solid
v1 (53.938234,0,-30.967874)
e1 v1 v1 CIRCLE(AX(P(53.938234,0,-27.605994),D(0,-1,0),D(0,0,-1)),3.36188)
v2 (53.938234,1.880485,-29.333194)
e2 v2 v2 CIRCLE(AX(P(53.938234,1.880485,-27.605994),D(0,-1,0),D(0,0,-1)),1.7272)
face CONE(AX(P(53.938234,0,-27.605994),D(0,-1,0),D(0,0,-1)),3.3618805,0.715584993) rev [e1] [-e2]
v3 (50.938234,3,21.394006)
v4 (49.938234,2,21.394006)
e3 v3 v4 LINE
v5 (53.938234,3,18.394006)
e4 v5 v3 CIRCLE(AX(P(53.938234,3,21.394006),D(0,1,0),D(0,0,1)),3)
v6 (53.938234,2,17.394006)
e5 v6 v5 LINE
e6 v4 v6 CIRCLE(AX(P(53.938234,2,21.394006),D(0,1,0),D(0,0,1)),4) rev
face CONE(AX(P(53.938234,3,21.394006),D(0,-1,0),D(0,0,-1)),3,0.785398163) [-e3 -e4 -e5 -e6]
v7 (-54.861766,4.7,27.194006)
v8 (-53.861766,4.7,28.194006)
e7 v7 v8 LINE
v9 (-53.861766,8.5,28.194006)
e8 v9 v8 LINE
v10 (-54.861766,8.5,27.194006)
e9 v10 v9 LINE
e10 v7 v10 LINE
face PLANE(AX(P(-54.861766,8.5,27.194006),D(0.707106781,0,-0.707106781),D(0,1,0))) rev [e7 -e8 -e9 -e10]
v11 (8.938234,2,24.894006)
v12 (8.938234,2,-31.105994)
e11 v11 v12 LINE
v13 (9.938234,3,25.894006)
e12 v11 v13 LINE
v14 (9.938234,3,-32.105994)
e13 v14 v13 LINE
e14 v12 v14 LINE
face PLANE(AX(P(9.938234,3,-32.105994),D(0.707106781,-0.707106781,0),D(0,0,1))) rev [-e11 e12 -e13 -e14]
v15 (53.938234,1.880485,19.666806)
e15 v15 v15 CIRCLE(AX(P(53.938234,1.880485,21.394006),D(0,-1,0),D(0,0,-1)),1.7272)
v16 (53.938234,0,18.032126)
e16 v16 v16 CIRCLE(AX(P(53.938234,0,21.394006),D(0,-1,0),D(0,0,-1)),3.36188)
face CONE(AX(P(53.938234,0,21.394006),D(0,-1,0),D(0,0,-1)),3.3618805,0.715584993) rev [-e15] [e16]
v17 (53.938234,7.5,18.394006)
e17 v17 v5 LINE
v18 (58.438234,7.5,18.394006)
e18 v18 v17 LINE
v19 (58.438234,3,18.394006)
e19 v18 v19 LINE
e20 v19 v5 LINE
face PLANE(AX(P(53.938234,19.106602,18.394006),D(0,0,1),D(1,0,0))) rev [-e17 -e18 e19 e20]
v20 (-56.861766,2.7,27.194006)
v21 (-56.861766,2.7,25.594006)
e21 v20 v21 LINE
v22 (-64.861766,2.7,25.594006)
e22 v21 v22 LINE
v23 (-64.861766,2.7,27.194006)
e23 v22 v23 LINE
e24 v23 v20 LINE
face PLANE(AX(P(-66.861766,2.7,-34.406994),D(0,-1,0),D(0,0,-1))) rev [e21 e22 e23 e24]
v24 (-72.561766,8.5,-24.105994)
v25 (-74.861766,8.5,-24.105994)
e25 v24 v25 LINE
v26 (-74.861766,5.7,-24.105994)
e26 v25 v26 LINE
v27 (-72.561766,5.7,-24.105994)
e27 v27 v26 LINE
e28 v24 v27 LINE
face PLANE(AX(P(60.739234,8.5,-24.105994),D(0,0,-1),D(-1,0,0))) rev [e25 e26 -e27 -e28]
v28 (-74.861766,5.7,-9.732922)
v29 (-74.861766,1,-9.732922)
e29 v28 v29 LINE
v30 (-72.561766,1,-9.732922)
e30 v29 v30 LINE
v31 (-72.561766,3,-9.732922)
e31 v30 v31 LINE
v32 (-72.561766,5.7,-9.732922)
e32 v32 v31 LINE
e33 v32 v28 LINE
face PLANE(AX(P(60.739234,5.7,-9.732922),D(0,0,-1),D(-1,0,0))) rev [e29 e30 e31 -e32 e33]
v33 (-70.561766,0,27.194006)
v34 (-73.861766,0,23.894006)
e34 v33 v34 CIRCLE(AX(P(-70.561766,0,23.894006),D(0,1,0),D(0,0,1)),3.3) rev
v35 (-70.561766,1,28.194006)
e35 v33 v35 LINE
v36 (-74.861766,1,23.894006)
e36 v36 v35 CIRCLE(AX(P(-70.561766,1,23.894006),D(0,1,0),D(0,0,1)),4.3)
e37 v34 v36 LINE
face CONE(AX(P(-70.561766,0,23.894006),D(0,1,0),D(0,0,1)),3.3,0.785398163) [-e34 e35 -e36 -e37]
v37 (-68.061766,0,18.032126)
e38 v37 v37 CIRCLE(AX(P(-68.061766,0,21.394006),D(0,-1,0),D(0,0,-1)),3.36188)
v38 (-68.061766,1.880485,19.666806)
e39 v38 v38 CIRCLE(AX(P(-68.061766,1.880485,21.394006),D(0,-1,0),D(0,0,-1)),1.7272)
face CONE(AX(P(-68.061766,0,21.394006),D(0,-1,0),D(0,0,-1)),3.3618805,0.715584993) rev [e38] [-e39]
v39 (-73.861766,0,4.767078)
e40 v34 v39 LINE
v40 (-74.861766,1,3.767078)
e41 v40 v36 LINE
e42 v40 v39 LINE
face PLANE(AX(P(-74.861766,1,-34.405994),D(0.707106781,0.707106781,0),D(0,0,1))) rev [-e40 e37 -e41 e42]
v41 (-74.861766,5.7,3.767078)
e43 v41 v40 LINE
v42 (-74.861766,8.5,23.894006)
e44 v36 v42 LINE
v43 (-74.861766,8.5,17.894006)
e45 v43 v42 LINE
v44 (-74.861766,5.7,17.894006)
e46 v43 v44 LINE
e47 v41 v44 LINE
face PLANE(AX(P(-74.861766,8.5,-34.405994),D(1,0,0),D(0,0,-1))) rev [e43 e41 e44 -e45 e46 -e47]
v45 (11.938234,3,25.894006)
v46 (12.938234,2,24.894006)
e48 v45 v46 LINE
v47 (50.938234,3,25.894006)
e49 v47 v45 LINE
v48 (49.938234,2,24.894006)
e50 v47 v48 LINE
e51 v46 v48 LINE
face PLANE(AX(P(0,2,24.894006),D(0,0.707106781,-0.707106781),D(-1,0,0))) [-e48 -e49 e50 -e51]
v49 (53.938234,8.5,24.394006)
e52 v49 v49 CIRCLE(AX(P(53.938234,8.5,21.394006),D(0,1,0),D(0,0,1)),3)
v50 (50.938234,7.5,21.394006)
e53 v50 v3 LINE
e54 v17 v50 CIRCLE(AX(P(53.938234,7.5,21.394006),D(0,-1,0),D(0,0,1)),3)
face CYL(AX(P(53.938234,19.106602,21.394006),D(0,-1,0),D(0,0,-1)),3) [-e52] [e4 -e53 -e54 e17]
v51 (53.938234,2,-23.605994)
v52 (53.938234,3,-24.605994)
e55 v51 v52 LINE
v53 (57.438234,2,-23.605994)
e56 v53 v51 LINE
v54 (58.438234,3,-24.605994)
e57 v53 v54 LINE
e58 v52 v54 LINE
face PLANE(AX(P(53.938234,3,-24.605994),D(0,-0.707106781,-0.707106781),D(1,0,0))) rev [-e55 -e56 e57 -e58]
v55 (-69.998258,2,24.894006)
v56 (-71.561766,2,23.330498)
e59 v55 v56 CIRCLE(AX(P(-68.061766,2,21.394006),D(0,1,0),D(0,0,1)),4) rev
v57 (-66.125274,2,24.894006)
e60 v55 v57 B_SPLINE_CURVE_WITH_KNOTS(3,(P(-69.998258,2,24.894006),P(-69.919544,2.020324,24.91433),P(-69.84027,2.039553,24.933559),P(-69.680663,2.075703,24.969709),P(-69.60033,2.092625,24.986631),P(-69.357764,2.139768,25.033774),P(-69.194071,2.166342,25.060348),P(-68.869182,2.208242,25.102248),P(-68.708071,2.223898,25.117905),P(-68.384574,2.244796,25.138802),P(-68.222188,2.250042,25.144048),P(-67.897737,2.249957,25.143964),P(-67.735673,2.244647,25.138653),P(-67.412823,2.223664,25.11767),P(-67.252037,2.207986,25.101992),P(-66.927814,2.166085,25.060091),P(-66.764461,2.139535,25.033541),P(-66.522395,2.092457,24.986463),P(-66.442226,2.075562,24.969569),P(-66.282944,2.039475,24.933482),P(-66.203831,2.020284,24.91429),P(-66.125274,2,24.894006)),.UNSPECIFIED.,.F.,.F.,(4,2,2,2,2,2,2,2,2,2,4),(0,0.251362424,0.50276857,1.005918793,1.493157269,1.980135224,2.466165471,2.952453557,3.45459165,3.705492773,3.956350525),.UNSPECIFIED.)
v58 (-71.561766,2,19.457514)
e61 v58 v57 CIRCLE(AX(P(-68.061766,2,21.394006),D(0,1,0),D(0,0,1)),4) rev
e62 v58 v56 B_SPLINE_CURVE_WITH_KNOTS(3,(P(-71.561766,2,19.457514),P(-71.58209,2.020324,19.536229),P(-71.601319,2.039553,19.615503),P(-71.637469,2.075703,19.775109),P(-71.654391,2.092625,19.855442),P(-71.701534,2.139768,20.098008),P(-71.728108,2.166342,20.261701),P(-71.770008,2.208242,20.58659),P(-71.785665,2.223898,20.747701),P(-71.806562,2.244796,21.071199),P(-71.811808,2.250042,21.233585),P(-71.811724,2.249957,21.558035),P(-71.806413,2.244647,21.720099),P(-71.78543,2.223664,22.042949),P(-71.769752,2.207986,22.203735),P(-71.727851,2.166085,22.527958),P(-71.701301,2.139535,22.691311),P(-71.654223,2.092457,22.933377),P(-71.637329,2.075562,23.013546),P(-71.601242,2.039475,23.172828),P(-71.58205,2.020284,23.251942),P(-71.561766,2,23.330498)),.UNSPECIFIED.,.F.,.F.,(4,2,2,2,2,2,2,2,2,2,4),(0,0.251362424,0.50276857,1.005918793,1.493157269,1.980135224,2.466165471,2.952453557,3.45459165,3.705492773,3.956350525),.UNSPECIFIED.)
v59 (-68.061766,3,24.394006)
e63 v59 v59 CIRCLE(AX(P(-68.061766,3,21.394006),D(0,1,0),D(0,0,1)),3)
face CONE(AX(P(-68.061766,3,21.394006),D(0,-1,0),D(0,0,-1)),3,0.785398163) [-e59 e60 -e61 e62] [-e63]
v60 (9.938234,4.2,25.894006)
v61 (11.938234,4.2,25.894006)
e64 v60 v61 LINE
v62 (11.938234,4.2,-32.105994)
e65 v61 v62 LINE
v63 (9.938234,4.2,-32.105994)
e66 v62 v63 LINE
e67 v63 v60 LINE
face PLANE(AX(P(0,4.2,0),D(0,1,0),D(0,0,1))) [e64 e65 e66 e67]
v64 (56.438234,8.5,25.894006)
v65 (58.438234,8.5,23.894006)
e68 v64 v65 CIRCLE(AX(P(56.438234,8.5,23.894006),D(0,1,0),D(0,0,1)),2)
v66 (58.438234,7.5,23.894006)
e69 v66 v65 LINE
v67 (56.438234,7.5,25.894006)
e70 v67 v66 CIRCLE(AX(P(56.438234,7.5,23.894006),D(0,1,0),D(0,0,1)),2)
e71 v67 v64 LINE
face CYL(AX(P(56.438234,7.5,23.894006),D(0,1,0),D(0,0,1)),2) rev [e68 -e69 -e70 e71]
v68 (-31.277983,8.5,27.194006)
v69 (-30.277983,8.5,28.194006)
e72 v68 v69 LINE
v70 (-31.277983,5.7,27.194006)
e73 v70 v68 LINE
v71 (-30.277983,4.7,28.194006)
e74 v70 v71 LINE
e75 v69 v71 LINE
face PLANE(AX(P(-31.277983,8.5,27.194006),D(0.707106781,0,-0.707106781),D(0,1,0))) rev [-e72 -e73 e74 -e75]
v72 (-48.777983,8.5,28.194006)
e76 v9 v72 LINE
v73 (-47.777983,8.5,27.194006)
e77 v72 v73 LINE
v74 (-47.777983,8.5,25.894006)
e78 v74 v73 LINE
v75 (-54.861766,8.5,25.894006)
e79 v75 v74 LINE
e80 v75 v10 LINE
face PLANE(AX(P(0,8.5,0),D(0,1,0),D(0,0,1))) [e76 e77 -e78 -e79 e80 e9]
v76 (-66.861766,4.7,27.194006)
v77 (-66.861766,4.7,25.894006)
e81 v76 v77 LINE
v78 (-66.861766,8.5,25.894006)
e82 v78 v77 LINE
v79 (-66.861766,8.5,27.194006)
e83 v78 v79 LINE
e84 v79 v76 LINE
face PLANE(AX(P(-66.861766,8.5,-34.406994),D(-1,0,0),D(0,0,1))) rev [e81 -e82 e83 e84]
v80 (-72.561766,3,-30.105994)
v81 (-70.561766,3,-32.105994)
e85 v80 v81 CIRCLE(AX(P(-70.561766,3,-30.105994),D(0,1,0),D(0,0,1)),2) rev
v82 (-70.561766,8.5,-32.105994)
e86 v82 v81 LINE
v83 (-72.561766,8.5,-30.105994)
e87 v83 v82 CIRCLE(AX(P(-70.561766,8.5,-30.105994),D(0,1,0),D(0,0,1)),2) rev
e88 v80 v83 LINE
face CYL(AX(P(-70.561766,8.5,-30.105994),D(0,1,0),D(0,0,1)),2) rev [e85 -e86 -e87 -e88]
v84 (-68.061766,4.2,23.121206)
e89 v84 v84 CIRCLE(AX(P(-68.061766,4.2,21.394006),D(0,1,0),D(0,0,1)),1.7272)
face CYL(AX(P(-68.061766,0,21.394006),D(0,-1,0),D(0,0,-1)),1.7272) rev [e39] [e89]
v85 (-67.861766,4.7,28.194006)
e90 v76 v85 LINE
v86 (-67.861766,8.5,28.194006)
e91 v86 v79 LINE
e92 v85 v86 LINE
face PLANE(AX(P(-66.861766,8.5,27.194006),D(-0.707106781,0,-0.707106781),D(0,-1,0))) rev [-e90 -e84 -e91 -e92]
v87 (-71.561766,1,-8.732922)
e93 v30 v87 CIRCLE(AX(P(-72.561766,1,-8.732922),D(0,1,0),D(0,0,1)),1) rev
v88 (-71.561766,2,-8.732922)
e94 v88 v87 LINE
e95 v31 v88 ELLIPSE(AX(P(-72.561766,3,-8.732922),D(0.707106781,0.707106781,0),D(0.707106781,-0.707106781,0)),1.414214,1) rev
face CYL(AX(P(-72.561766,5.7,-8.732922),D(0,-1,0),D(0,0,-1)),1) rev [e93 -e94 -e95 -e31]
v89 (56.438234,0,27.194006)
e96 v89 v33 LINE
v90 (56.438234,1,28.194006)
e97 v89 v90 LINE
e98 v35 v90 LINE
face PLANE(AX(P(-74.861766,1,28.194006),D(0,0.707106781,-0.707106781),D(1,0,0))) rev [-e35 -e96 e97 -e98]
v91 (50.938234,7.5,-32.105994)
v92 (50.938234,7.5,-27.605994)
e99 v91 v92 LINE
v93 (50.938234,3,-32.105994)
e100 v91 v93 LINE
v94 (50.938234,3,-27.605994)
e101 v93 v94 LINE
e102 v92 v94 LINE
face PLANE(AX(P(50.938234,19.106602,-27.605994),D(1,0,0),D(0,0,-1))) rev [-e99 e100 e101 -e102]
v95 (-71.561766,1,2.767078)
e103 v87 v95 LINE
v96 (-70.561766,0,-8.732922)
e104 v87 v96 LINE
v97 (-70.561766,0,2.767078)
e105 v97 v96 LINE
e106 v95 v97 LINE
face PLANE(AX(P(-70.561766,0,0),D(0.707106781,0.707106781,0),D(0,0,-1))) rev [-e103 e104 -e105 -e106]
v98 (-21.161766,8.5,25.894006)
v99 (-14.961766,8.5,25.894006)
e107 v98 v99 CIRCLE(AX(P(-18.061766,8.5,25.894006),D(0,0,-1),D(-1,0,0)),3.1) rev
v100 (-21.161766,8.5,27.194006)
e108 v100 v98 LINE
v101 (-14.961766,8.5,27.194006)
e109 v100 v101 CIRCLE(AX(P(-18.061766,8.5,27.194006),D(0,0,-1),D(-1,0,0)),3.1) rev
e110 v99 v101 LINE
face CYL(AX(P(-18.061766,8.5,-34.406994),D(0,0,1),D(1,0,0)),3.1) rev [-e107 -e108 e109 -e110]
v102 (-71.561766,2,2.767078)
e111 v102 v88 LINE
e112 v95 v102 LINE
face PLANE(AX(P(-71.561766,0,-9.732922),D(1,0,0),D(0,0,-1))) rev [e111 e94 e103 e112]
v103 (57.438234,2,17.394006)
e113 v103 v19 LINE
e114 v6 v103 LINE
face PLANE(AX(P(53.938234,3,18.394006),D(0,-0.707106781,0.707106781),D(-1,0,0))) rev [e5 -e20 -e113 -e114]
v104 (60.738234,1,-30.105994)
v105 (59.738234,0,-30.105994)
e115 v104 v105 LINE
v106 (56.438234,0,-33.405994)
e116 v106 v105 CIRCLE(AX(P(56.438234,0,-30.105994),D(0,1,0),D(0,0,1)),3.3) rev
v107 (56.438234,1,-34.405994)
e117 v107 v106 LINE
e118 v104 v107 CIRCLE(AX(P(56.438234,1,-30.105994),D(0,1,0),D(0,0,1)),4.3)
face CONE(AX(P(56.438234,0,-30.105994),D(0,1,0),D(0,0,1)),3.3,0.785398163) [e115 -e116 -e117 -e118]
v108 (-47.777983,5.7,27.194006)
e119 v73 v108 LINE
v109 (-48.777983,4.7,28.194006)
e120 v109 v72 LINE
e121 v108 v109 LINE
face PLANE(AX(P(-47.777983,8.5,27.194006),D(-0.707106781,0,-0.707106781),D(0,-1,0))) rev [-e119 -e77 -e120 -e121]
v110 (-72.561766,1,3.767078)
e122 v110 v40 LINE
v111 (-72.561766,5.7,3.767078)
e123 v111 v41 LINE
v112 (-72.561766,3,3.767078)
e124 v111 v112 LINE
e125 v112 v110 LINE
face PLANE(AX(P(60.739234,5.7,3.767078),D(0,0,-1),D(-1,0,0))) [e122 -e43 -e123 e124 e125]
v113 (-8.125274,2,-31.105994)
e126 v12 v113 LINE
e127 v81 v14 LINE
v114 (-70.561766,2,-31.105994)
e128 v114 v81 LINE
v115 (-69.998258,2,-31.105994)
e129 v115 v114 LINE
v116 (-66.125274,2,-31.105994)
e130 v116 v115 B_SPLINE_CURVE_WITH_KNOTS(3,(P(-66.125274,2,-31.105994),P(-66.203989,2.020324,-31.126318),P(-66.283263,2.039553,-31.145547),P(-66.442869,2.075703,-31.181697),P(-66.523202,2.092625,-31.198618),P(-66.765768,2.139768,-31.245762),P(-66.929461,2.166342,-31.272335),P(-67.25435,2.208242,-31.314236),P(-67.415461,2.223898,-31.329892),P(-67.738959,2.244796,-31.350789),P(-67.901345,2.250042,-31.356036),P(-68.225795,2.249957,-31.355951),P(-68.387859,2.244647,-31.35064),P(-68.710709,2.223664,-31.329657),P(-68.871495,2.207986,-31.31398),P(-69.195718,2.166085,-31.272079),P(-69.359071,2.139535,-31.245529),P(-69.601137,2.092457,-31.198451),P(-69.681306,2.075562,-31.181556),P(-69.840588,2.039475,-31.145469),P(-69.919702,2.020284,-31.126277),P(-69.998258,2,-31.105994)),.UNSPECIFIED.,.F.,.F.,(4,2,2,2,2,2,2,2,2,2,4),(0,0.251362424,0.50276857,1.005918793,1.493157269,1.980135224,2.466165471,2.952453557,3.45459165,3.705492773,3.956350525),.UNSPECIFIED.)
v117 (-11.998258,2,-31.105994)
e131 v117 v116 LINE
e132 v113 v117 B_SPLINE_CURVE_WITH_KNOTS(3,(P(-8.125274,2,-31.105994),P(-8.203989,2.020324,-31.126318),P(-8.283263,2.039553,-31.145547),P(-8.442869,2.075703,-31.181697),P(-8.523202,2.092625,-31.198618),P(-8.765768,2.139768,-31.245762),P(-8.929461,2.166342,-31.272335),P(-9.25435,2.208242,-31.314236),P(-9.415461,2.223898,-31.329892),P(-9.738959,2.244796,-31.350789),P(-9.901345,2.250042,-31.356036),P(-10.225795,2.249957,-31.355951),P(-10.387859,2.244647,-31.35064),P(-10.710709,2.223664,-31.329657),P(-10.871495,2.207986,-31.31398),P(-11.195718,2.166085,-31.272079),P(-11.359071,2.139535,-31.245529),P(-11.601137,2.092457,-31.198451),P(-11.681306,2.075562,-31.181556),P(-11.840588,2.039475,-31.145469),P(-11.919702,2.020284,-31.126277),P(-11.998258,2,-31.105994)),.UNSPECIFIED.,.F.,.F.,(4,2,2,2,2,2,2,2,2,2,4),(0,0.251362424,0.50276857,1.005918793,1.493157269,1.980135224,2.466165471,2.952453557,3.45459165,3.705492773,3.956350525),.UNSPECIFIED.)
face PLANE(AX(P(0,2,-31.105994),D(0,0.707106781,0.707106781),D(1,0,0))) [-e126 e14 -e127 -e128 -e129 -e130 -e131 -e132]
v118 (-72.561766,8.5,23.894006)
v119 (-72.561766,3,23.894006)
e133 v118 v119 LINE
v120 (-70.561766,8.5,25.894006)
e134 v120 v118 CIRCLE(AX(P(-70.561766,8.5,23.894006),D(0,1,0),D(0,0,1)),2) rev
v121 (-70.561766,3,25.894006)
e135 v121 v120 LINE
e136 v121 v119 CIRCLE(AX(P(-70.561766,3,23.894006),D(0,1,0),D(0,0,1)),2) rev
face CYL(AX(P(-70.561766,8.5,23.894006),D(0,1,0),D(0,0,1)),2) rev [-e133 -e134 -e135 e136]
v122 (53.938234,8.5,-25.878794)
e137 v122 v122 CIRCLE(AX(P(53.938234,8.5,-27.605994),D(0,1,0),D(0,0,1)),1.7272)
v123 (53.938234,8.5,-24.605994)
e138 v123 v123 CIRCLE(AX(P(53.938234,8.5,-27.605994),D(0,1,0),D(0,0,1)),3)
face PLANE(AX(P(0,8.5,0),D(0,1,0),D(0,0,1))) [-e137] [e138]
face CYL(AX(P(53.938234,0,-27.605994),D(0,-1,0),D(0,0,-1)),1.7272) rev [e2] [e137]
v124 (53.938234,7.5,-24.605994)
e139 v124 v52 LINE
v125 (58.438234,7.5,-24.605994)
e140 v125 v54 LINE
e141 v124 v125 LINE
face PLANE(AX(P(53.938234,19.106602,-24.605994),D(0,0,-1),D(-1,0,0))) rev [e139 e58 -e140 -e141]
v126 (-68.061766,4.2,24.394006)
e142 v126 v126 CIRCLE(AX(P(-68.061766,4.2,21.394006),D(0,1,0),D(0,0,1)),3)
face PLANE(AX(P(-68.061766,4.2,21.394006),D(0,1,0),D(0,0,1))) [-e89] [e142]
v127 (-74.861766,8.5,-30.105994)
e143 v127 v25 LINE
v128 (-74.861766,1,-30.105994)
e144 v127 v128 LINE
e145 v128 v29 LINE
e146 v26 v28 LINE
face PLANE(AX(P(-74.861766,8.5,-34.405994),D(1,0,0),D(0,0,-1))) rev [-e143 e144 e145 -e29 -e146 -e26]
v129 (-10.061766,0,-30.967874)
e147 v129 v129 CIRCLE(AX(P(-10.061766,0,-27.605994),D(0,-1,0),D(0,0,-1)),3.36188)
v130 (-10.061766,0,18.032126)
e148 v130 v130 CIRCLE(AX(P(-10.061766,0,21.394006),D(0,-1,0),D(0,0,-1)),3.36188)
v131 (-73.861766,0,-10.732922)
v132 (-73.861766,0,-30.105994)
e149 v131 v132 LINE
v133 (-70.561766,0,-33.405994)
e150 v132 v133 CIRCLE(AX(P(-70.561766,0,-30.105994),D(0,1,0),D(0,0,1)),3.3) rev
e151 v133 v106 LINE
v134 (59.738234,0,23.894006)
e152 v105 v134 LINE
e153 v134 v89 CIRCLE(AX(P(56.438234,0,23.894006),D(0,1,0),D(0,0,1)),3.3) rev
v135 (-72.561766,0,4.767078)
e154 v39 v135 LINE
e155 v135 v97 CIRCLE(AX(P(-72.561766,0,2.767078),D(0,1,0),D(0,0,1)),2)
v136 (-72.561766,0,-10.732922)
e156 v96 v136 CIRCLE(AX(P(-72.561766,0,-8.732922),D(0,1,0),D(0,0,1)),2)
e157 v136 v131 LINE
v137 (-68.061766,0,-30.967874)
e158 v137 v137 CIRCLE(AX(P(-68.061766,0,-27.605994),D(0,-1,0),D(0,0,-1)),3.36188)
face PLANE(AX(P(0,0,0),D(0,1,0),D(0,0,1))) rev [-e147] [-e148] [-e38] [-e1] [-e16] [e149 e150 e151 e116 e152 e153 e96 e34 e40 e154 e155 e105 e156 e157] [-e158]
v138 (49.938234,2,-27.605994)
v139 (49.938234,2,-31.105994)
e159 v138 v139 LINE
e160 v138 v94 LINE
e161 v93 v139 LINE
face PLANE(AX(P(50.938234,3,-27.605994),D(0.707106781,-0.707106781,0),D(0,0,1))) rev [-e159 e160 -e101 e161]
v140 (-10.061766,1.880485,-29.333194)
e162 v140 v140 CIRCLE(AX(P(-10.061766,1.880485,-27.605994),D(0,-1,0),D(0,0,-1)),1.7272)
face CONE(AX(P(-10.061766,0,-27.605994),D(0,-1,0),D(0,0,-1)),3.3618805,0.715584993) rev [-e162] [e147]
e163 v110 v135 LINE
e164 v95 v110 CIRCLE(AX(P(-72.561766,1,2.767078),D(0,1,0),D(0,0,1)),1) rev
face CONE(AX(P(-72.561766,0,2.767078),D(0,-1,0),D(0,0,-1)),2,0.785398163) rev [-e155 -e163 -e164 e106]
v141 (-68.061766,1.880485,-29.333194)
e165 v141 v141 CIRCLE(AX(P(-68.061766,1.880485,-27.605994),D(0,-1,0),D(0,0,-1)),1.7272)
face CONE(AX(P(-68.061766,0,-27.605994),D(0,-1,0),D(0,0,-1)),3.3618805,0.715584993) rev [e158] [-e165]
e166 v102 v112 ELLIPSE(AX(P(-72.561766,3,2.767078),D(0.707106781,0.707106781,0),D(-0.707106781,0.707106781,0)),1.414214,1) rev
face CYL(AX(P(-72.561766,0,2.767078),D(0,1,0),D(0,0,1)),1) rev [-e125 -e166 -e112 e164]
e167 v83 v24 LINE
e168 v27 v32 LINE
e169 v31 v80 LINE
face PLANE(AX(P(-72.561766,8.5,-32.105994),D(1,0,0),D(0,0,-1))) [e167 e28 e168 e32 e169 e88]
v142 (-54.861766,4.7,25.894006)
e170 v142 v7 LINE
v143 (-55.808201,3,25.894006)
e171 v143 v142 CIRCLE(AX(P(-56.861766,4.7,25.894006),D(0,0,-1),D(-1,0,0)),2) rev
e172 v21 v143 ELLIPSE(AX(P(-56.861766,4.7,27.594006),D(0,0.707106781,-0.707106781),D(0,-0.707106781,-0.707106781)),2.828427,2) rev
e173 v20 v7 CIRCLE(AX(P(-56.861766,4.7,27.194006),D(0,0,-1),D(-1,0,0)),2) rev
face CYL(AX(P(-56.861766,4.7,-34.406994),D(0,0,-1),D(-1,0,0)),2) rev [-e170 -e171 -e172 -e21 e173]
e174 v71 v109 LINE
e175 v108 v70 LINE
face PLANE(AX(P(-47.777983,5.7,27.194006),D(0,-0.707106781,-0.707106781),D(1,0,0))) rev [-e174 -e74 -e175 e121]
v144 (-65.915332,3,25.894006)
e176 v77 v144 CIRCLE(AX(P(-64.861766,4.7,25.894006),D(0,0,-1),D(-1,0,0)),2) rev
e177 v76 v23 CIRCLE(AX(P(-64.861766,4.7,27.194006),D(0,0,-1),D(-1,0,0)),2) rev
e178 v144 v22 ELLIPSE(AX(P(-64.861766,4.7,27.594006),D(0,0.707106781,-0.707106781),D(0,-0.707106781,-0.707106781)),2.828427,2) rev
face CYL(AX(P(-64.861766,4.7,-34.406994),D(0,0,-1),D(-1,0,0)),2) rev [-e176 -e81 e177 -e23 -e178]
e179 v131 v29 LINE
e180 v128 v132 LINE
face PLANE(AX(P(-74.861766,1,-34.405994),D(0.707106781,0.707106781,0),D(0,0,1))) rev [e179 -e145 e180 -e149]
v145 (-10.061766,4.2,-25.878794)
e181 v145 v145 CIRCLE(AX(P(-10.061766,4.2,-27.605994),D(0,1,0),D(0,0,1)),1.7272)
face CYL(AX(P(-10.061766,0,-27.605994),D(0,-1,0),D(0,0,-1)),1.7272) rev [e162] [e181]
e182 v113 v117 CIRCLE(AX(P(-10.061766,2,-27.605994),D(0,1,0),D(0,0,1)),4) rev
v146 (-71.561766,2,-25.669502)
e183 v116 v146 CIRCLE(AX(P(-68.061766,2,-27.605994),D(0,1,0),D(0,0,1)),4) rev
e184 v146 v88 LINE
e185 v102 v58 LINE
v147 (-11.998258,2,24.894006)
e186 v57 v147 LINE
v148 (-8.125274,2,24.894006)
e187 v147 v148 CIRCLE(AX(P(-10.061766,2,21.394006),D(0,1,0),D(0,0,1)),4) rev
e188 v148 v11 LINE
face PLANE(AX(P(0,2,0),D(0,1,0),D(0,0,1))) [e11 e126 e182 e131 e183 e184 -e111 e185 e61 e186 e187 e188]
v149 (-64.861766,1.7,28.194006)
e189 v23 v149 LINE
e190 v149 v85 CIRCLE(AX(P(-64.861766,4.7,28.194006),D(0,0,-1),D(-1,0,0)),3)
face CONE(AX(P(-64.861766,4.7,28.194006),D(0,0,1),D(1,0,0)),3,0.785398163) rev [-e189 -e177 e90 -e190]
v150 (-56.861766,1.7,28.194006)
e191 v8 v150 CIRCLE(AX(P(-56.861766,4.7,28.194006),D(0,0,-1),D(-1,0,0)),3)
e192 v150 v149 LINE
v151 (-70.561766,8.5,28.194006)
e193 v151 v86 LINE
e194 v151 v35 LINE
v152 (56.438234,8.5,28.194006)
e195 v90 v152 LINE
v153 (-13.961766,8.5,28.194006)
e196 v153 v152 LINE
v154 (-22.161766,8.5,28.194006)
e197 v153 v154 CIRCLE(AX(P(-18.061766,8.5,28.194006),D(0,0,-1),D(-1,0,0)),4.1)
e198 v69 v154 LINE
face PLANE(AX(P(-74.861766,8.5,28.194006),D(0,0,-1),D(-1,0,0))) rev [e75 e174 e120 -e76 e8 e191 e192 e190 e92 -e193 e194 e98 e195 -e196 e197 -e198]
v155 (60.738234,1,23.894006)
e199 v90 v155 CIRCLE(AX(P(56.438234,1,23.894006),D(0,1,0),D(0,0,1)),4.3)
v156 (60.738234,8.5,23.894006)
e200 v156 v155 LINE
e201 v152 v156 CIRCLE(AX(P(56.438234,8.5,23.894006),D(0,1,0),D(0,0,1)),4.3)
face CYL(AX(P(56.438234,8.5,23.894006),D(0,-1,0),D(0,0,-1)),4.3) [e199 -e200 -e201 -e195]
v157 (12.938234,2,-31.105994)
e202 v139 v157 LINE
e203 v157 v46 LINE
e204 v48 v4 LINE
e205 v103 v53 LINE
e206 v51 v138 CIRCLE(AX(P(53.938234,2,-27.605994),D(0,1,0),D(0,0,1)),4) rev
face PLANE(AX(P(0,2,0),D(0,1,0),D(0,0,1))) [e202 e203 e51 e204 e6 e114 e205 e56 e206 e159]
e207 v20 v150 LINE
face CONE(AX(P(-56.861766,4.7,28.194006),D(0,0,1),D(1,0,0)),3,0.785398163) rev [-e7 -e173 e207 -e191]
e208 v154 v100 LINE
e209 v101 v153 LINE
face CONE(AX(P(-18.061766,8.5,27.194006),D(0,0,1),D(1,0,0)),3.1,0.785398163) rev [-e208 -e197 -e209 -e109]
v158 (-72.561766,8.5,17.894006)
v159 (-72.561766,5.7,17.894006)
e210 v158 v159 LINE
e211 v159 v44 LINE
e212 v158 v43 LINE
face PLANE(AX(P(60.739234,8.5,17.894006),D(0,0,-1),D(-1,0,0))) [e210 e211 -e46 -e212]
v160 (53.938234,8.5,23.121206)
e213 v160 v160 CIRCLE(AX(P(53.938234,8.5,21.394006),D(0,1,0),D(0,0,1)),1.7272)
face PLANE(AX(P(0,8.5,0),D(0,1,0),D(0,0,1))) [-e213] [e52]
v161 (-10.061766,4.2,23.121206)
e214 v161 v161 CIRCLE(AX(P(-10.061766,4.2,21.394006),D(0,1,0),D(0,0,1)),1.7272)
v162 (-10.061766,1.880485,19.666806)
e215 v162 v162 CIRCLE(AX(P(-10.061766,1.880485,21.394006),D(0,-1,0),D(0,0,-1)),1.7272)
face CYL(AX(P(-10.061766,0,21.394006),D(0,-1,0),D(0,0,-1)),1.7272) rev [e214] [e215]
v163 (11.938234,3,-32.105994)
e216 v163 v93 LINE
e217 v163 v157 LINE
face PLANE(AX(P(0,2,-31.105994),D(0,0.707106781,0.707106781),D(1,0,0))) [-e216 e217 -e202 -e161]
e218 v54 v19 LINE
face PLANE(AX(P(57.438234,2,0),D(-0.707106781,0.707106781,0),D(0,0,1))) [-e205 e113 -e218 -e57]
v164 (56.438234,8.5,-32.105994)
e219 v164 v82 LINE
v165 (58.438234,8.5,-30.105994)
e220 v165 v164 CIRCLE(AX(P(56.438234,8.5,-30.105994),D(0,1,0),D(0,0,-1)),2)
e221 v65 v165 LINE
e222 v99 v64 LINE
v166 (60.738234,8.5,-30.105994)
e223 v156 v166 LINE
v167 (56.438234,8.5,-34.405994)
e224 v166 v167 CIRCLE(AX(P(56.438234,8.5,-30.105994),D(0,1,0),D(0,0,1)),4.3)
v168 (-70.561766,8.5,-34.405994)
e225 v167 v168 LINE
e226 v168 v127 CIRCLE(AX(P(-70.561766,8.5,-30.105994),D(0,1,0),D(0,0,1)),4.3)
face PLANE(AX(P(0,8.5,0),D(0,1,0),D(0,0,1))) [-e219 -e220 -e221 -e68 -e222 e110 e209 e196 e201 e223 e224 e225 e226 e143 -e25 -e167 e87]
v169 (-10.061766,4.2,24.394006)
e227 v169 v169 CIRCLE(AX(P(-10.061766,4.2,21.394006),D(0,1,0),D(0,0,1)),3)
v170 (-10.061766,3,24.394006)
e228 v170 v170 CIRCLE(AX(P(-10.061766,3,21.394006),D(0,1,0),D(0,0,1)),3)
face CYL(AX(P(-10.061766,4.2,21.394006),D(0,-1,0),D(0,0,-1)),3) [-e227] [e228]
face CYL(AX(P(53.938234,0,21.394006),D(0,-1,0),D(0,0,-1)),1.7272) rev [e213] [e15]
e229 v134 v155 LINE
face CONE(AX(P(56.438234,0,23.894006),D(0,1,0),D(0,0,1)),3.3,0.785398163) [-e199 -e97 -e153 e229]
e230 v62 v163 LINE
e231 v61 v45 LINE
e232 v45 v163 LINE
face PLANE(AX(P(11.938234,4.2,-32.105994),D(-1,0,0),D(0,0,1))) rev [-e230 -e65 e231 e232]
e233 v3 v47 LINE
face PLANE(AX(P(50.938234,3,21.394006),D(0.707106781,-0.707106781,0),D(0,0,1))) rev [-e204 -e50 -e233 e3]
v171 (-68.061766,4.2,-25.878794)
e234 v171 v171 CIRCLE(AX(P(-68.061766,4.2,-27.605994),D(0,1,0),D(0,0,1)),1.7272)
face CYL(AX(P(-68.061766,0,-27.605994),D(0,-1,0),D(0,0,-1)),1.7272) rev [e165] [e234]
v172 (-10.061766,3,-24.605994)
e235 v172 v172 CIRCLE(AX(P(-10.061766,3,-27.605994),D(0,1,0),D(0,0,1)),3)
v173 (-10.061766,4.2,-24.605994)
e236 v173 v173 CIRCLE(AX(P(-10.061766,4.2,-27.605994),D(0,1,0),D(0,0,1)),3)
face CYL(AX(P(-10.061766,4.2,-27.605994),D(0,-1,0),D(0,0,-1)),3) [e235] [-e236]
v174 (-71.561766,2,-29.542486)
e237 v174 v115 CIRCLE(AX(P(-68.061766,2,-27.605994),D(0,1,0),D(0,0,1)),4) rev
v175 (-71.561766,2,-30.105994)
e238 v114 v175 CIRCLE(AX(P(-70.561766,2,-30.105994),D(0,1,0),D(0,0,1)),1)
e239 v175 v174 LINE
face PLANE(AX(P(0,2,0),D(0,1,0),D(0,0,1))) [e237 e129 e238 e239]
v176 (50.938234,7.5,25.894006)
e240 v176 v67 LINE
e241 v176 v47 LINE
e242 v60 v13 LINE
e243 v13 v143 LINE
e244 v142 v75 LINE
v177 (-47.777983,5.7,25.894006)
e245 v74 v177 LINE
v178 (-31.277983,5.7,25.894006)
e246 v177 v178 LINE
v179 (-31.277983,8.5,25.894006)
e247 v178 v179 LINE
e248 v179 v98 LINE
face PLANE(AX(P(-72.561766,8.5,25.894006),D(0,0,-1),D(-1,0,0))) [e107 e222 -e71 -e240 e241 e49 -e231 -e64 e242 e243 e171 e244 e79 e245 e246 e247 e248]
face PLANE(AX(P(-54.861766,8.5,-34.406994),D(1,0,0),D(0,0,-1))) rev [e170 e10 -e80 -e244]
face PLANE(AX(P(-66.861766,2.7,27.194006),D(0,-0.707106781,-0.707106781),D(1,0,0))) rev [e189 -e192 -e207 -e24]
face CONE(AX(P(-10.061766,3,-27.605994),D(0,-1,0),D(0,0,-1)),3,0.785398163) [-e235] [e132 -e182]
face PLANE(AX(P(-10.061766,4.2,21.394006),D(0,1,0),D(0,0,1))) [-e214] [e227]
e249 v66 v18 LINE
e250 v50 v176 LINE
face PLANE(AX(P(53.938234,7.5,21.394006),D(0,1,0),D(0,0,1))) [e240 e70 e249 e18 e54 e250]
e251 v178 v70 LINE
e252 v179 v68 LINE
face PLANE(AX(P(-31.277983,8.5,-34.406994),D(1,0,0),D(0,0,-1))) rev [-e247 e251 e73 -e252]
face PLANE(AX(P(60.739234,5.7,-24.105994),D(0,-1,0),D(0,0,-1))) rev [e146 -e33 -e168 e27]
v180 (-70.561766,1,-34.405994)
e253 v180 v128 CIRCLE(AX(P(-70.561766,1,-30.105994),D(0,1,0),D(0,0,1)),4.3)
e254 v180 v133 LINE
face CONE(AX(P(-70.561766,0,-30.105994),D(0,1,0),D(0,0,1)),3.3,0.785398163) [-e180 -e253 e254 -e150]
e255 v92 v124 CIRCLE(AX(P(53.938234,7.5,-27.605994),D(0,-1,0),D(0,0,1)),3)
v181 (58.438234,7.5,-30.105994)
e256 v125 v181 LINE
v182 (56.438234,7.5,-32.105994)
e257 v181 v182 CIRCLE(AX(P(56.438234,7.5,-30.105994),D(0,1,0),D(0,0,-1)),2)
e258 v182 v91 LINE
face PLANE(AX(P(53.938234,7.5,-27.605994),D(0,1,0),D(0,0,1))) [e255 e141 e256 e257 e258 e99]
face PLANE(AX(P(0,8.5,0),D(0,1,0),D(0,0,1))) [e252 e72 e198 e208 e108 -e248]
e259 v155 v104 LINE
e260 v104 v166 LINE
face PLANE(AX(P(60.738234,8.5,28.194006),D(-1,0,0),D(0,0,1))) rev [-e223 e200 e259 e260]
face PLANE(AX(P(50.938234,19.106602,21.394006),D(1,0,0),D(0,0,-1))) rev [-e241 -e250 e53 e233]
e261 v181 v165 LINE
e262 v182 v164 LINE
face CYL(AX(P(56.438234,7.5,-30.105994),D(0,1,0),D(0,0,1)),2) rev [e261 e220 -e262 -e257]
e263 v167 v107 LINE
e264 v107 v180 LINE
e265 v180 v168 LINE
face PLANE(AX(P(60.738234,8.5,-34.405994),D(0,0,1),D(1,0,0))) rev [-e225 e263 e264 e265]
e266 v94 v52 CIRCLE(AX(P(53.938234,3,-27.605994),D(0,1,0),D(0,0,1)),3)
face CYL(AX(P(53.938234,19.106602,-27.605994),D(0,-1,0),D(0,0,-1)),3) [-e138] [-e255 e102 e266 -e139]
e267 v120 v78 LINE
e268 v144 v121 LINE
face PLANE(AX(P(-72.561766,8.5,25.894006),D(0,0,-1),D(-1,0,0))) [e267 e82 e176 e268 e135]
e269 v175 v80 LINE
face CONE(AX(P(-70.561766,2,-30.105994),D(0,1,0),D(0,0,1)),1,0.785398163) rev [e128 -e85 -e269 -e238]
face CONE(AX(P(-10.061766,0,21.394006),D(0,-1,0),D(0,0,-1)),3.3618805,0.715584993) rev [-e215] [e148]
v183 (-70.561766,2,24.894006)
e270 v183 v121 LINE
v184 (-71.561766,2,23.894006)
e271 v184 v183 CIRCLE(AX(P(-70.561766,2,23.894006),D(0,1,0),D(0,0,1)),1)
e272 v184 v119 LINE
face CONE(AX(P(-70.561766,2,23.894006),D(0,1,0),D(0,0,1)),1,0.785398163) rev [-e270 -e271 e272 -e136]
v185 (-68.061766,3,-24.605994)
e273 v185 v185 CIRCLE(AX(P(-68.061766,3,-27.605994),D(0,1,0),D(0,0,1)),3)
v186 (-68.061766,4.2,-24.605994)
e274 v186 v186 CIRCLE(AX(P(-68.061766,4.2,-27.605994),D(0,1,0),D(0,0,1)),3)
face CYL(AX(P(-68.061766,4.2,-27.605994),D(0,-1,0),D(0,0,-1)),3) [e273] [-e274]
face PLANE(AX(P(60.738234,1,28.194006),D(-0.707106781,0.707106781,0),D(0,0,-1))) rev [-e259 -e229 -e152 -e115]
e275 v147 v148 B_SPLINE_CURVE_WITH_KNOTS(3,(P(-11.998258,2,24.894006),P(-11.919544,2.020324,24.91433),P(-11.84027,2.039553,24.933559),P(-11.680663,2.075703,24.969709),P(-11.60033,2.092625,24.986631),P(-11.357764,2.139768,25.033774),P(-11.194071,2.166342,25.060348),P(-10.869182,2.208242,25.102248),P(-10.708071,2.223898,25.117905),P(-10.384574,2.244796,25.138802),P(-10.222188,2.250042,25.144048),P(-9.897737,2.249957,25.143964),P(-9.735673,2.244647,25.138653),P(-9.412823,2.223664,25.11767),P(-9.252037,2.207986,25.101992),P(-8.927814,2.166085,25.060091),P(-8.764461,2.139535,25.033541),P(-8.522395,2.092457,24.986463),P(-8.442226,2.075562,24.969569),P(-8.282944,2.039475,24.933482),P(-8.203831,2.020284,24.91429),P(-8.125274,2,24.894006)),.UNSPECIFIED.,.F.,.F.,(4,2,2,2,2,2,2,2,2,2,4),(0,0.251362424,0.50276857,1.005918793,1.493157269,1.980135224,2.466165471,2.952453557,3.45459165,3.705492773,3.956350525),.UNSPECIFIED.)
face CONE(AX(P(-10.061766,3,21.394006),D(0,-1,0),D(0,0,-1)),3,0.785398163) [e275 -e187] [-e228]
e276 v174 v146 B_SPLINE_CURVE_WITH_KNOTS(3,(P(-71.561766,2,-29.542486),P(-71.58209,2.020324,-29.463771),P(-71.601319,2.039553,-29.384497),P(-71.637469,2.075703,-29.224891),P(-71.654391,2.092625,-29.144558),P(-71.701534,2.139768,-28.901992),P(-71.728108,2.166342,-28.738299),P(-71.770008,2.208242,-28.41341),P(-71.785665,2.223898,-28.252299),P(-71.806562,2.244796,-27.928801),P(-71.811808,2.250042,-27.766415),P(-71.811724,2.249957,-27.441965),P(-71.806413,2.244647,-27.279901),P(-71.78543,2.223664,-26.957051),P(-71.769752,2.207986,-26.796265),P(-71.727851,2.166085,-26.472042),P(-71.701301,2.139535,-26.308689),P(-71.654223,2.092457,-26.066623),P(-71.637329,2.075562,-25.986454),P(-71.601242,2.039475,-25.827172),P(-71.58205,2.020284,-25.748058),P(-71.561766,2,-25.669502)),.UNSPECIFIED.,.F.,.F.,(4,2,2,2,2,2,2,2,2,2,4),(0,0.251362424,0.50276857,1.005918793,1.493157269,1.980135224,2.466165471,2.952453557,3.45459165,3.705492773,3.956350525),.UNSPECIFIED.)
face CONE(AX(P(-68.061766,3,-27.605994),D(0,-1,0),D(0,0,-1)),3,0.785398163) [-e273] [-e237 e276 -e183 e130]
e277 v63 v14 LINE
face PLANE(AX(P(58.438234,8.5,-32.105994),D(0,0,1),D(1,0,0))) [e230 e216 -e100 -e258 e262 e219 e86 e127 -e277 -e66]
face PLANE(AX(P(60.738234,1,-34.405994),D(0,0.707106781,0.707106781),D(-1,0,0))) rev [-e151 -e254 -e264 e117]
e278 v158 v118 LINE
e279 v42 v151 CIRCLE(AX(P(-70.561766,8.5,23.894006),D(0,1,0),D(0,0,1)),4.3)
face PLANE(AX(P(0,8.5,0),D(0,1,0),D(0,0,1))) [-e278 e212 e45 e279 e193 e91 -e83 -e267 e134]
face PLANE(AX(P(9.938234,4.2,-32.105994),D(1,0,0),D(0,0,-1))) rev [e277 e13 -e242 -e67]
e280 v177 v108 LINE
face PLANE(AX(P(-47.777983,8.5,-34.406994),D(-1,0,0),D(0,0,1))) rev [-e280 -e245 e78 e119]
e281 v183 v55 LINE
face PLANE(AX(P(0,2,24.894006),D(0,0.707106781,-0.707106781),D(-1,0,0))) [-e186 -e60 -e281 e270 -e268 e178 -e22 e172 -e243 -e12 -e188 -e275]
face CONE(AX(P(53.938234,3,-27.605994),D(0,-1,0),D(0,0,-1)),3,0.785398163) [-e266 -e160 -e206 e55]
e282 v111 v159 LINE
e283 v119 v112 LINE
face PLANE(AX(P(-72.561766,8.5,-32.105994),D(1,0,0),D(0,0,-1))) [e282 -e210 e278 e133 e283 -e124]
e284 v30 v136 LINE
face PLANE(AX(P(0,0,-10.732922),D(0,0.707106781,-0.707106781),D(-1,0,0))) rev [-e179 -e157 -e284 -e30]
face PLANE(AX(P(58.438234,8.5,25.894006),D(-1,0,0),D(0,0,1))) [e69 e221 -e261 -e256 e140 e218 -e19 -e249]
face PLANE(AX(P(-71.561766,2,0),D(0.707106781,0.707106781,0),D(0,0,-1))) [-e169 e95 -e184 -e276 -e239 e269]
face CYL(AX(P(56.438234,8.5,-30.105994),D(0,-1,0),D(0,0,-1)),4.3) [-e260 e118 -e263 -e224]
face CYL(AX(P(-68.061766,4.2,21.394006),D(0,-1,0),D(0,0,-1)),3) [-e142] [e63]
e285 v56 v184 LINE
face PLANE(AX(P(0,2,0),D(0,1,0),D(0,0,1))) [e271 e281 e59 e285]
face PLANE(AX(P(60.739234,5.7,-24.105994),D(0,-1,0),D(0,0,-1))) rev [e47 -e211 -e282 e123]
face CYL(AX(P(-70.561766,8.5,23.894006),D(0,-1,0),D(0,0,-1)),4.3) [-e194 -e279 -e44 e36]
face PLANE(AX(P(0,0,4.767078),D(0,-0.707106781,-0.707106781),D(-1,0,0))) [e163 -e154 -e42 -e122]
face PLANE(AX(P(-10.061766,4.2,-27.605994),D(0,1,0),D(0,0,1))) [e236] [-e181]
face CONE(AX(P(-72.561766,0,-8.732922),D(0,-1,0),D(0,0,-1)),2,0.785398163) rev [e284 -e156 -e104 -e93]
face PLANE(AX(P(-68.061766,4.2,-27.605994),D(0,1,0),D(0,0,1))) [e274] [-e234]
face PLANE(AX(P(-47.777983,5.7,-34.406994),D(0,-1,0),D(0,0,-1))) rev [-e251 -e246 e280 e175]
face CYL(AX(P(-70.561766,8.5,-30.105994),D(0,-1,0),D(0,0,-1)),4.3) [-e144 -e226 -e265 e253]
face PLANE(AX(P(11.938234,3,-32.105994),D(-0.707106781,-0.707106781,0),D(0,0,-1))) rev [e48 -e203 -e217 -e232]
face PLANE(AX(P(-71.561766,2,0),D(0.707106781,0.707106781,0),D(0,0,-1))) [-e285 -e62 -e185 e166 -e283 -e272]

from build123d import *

# Parameters (mm, degrees)
SKETCH3_W                                         = 135.6
SKETCH3_H                                         = 62.6
SKETCH3_W_2                                       = 131
SKETCH3_H_2                                       = 58
BOSS_EXTRUDE1_DEPTH                               = 8.5
SKETCH5_W                                         = 131
SKETCH5_H                                         = 58
BOSS_EXTRUDE2_DEPTH                               = 2
SKETCH6_R                                         = 3
BOSS_EXTRUDE3_DEPTH                               = 2.2
SKETCH10_W                                        = 2
SKETCH10_H                                        = 58
BOSS_EXTRUDE4_DEPTH                               = 2.2
CUT_EXTRUDE1_REACH                                = 99.956
SKETCH11_R                                        = 3.1
SKETCH11_W                                        = 12
SKETCH11_H                                        = 5.8
SKETCH11_W_2                                      = 16.5
SKETCH11_H_2                                      = 2.8
CUT_EXTRUDE2_REACH                                = 142.155
SKETCH12_W                                        = 42
SKETCH12_H                                        = 2.8
SKETCH12_W_2                                      = 13.5
SKETCH12_H_2                                      = 3.7
FILLET6_R                                         = 2
FILLET8_R                                         = 2
CHAMFER1_SIZE                                     = 1
BOSS_EXTRUDE7_DEPTH                               = 6.5
FILLET20_R                                        = 4.3
CHAMFER5_SIZE                                     = 1
CSK_FOR_4_FLAT_HEAD_SOCKET_CAP_SCREW1_D           = 3.4544
CSK_FOR_4_FLAT_HEAD_SOCKET_CAP_SCREW1_DEPTH       = 14
CSK_FOR_4_FLAT_HEAD_SOCKET_CAP_SCREW1_CSINK_D     = 6.723761
CSK_FOR_4_FLAT_HEAD_SOCKET_CAP_SCREW1_CSINK_ANGLE = 82
CSK_FOR_4_FLAT_HEAD_SOCKET_CAP_SCREW1_TIP         = 1.037806461
CHAMFER7_SIZE                                     = 1
CHAMFER8_SIZE                                     = 1
CUT_EXTRUDE3_START                                = -1
CUT_EXTRUDE3_DEPTH                                = 1
FILLET21_R                                        = 2
CHAMFER9_SIZE                                     = 1
SKETCH30_W                                        = 3.3
SKETCH30_H                                        = 13.5
CUT_EXTRUDE4_DEPTH                                = 83.645668033
FILLET22_R                                        = 1
CHAMFER11_SIZE                                    = 1


# Some blends are built 0.0001 mm under size
with BuildPart() as part:
    # Sketch3 → Boss-Extrude1 (new body)
    with BuildSketch(Plane(origin=(0, 0, 0), x_dir=(1, 0, 0), z_dir=(0, 1, 0))):
        with Locations((-7.061766162, 3.105993834)):
            Rectangle(SKETCH3_W, SKETCH3_H)
        with Locations((-7.061766162, 3.105993834)):
            Rectangle(SKETCH3_W_2, SKETCH3_H_2, mode=Mode.SUBTRACT)
    extrude(amount=BOSS_EXTRUDE1_DEPTH)

    # Sketch5 → Boss-Extrude2 (add)
    with BuildSketch(Plane(origin=(0, 0, 0), x_dir=(1, 0, 0), z_dir=(0, 1, 0))):
        with Locations((-7.061766162, 3.105993834)):
            Rectangle(SKETCH5_W, SKETCH5_H)
    extrude(amount=BOSS_EXTRUDE2_DEPTH)

    # Sketch6 → Boss-Extrude3 (add)
    with BuildSketch(Plane(origin=(0, 2, 0), x_dir=(1, 0, 0), z_dir=(0, 1, 0))):
        with Locations(Location((-68.061766162, 27.605993834, 0), (0, 0, 270))):
            Circle(SKETCH6_R)
        with Locations(Location((-68.061766162, -21.394006166, 0), (0, 0, 270))):
            Circle(SKETCH6_R)
        with Locations(Location((-10.061766162, -21.394006166, 0), (0, 0, 270))):
            Circle(SKETCH6_R)
        with Locations(Location((-10.061766162, 27.605993834, 0), (0, 0, 270))):
            Circle(SKETCH6_R)
    extrude(amount=BOSS_EXTRUDE3_DEPTH)

    # Sketch10 → Boss-Extrude4 (add)
    with BuildSketch(Plane(origin=(0, 2, 0), x_dir=(1, 0, 0), z_dir=(0, 1, 0))):
        with Locations((10.938233838, 3.105993834)):
            Rectangle(SKETCH10_W, SKETCH10_H)
    extrude(amount=BOSS_EXTRUDE4_DEPTH)

    # Sketch11 → Cut-Extrude1 (cut, up to next)
    with BuildSketch(Plane.XY.offset(28.194006166), mode=Mode.PRIVATE) as cut_extrude1_sk1:
        with Locations((-18.061766162, 8.5)):
            Circle(SKETCH11_R)
    cut_extrude1_tool1 = extrude(cut_extrude1_sk1.sketch, amount=-CUT_EXTRUDE1_REACH, mode=Mode.PRIVATE) & part.part
    # Sketch11 → Cut-Extrude1 (cut, up to next)
    with BuildSketch(Plane.XY.offset(28.194006166), mode=Mode.PRIVATE) as cut_extrude1_sk2:
        with Locations((-60.861766162, 5.6)):
            Rectangle(SKETCH11_W, SKETCH11_H)
    cut_extrude1_tool2 = extrude(cut_extrude1_sk2.sketch, amount=-CUT_EXTRUDE1_REACH, mode=Mode.PRIVATE) & part.part
    # Sketch11 → Cut-Extrude1 (cut, up to next)
    with BuildSketch(Plane.XY.offset(28.194006166), mode=Mode.PRIVATE) as cut_extrude1_sk3:
        with Locations((-39.527982648, 7.1)):
            Rectangle(SKETCH11_W_2, SKETCH11_H_2)
    cut_extrude1_tool3 = extrude(cut_extrude1_sk3.sketch, amount=-CUT_EXTRUDE1_REACH, mode=Mode.PRIVATE) & part.part
    add(cut_extrude1_tool1.solids().sort_by_distance((-18.061766, 8.5, 28.194006))[0], mode=Mode.SUBTRACT)
    add(cut_extrude1_tool2.solids().sort_by_distance((-60.861766, 5.6, 28.194006))[0], mode=Mode.SUBTRACT)
    add(cut_extrude1_tool3.solids().sort_by_distance((-39.527983, 7.1, 28.194006))[0], mode=Mode.SUBTRACT)

    # Sketch12 → Cut-Extrude2 (cut, up to next)
    with BuildSketch(Plane.ZY.offset(74.861766162), mode=Mode.PRIVATE) as cut_extrude2_sk1:
        with Locations((-3.105993834, 7.1)):
            Rectangle(SKETCH12_W, SKETCH12_H)
    cut_extrude2_tool1 = extrude(cut_extrude2_sk1.sketch, amount=-CUT_EXTRUDE2_REACH, mode=Mode.PRIVATE) & part.part
    # Sketch12 → Cut-Extrude2 (cut, up to next)
    with BuildSketch(Plane.ZY.offset(74.861766162), mode=Mode.PRIVATE) as cut_extrude2_sk2:
        with Locations((-2.982922372, 3.85)):
            Rectangle(SKETCH12_W_2, SKETCH12_H_2)
    cut_extrude2_tool2 = extrude(cut_extrude2_sk2.sketch, amount=-CUT_EXTRUDE2_REACH, mode=Mode.PRIVATE) & part.part
    add(cut_extrude2_tool1.solids().sort_by_distance((-74.861766, 7.1, -3.105994))[0], mode=Mode.SUBTRACT)
    add(cut_extrude2_tool2.solids().sort_by_distance((-74.861766, 3.85, -2.982922))[0], mode=Mode.SUBTRACT)

    # Fillet6
    fillet6_edges = [part.edges().sort_by_distance(p)[0] for p in [
        (58.438233838, 5.25, -32.105993834),
    ]]
    fillet(fillet6_edges, radius=FILLET6_R)

    # Fillet8
    fillet8_edges = [part.edges().sort_by_distance(p)[0] for p in [
        (-72.561766162, 5.25, -32.105993834),
        (-72.561766162, 5.25, 25.894006166),
    ]]
    fillet(fillet8_edges, radius=FILLET8_R)

    # Chamfer1
    chamfer1_edges = [part.edges().sort_by_distance(p)[0] for p in [
        (-68.061766162, 2, -30.605993834),
        (-68.061766162, 2, 18.394006166),
        (-10.061766162, 2, 18.394006166),
        (-10.061766162, 2, -30.605993834),
    ]]
    chamfer(chamfer1_edges, length=CHAMFER1_SIZE)

    # Sketch24 → Boss-Extrude7 (add)
    with BuildSketch(Plane(origin=(0, 2, 0), x_dir=(1, 0, 0), z_dir=(0, 1, 0))):
        with BuildLine():
            Line((53.938233838, -18.394006166), (58.438233838, -18.394006166))
            Line((58.438233838, -18.394006166), (58.438233838, -25.894006166))
            Line((58.438233838, -25.894006166), (50.938233838, -25.894006166))
            Line((50.938233838, -25.894006166), (50.938233838, -21.394006166))
            ThreePointArc((50.938233838, -21.394006166), (51.816913494, -19.272685822), (53.938233838, -18.394006166))
        make_face()
        with BuildLine():
            Line((50.938233838, 27.605993834), (50.938233838, 32.105993834))
            Line((50.938233838, 32.105993834), (58.438233838, 32.105993834))
            Line((58.438233838, 32.105993834), (58.438233838, 24.605993834))
            Line((58.438233838, 24.605993834), (53.938233838, 24.605993834))
            ThreePointArc((53.938233838, 24.605993834), (51.816913494, 25.484673491), (50.938233838, 27.605993834))
        make_face()
    extrude(amount=BOSS_EXTRUDE7_DEPTH)

    # Fillet20
    fillet20_edges = [part.edges().sort_by_distance(p)[0] for p in [
        (-74.861766162, 4.25, -34.405993834),
        (60.738233838, 4.25, -34.405993834),
        (60.738233838, 4.25, 28.194006166),
        (-74.861766162, 4.25, 28.194006166),
    ]]
    fillet(fillet20_edges, radius=FILLET20_R)

    # Chamfer5
    # the kernel refuses this chamfer: 1 mm, written as the material it adds along each edge
    with BuildSketch(Plane(origin=(-72.561766162, 2, 23.894006166), x_dir=(0.9996219169112968, -0.027495876610586605, 0), z_dir=(0, 0, -1))) as chamfer5_piece_1:
        Polygon((CHAMFER5_SIZE * 0.999621916911, -CHAMFER5_SIZE * 0.0274958766106), (-CHAMFER5_SIZE * 0.0274958766106, -CHAMFER5_SIZE * 0.999621916911), (0, 0), align=None)
    extrude(amount=20.126928538)
    with BuildSketch(Plane(origin=(12.509916826, 2, 25.894006166), x_dir=(0, -0.027495876610586296, -0.9996219169112968), z_dir=(-1, 0, 0))) as chamfer5_piece_2_section:
        Polygon((CHAMFER5_SIZE * 0.999621916911, -CHAMFER5_SIZE * 0.0274958766106), (-CHAMFER5_SIZE * 0.0274958766106, -CHAMFER5_SIZE * 0.999621916911), (0, 0), align=None)
    chamfer5_piece_2 = extrude(amount=83.071682988, mode=Mode.PRIVATE)
    chamfer5_piece_2 = split(chamfer5_piece_2, bisect_by=Plane(origin=(12.224075332, 2.7, 25.537595909), z_dir=(0, -1, 0)), keep=Keep.TOP, mode=Mode.PRIVATE)
    add(chamfer5_piece_2)
    with BuildSketch(Plane(origin=(12.509916826, 2, 25.894006166), x_dir=(0, -0.027495876610586296, -0.9996219169112968), z_dir=(-1, 0, 0))) as chamfer5_piece_3_section:
        Polygon((CHAMFER5_SIZE * 0.999621916911, -CHAMFER5_SIZE * 0.0274958766106), (-CHAMFER5_SIZE * 0.0274958766106, -CHAMFER5_SIZE * 0.999621916911), (0, 0), align=None)
    chamfer5_piece_3 = extrude(amount=83.071682988, mode=Mode.PRIVATE)
    chamfer5_piece_3 = split(chamfer5_piece_3, bisect_by=Plane(origin=(-54.861766162, 2.8, 25.794006166), z_dir=(1, 0, 0)), keep=Keep.TOP, mode=Mode.PRIVATE)
    add(chamfer5_piece_3)
    with BuildSketch(Plane(origin=(12.509916826, 2, 25.894006166), x_dir=(0, -0.027495876610586296, -0.9996219169112968), z_dir=(-1, 0, 0))) as chamfer5_piece_4_section:
        Polygon((CHAMFER5_SIZE * 0.999621916911, -CHAMFER5_SIZE * 0.0274958766106), (-CHAMFER5_SIZE * 0.0274958766106, -CHAMFER5_SIZE * 0.999621916911), (0, 0), align=None)
    chamfer5_piece_4 = extrude(amount=83.071682988, mode=Mode.PRIVATE)
    chamfer5_piece_4 = split(chamfer5_piece_4, bisect_by=Plane(origin=(-66.861766162, 2.802568974, 25.79914411), z_dir=(-1, 0, 0)), keep=Keep.TOP, mode=Mode.PRIVATE)
    add(chamfer5_piece_4)
    with BuildSketch(Plane(origin=(-72.561766162, 2, -9.732922372), x_dir=(0.9996219169112968, -0.02749587661058639, 0), z_dir=(0, 0, -1))) as chamfer5_piece_5:
        Polygon((CHAMFER5_SIZE * 0.999621916911, -CHAMFER5_SIZE * 0.0274958766106), (-CHAMFER5_SIZE * 0.0274958766106, -CHAMFER5_SIZE * 0.999621916911), (0, 0), align=None)
    extrude(amount=20.373071462)
    with BuildSketch(Plane(origin=(-70.561766162, 2, -30.105993834), x_dir=(0, 0, -1), z_dir=(1, 0, 0))) as chamfer5_piece_6:
        Polygon((2 - CHAMFER5_SIZE, 0), (2, CHAMFER5_SIZE), (2, 0), align=None)
    revolve(axis=Axis((-70.561766162, 2, -30.105993834), (0, 1, 0)), revolution_arc=90)
    with BuildSketch(Plane(origin=(-70.561766162, 2, 23.894006166), x_dir=(0, 0, 1), z_dir=(1, 0, 0))) as chamfer5_piece_7:
        Polygon((2 - CHAMFER5_SIZE, 0), (2, -CHAMFER5_SIZE), (2, 0), align=None)
    revolve(axis=Axis((-70.561766162, 2, 23.894006166), (0, -1, 0)), revolution_arc=90)
    with BuildSketch(Plane(origin=(58.438233838, 2, -27.177676822), x_dir=(0.02749587661058907, 0.9996219169112965, 0), z_dir=(0, 0, 1))) as chamfer5_piece_8:
        Polygon((CHAMFER5_SIZE * 0.999621916911, CHAMFER5_SIZE * 0.0274958766106), (-CHAMFER5_SIZE * 0.0274958766106, CHAMFER5_SIZE * 0.999621916911), (0, 0), align=None)
    extrude(amount=48.143365976)
    with BuildSketch(Plane(origin=(53.938233838, 2, 21.394006166), x_dir=(-1, 0, 0), z_dir=(0, 0, 1))) as chamfer5_piece_9:
        Polygon((3, -CHAMFER5_SIZE), (3 + CHAMFER5_SIZE, 0), (3, 0), align=None)
    revolve(axis=Axis((53.938233838, 2, 21.394006166), (0, -1, 0)), revolution_arc=90)
    with BuildSketch(Plane(origin=(50.938233838, 2, 25.894006166), x_dir=(0.02749587661058907, 0.9996219169112965, 0), z_dir=(0, 0, -1)), Plane(origin=(53.938233838, 2, 18.394006166), x_dir=(0, 0.9996219169112968, 0.027495876610585623), z_dir=(1, 0, 0)), Plane(origin=(58.438233838, 2, -24.605993834), x_dir=(0, 0.9996219169112968, -0.027495876610585623), z_dir=(-1, 0, 0)), Plane(origin=(50.938233838, 2, -27.605993834), x_dir=(0.02749587661058907, 0.9996219169112965, 0), z_dir=(0, 0, -1))) as chamfer5_piece_10:
        Polygon((CHAMFER5_SIZE * 0.999621916911, -CHAMFER5_SIZE * 0.0274958766106), (-CHAMFER5_SIZE * 0.0274958766106, -CHAMFER5_SIZE * 0.999621916911), (0, 0), align=None)
    extrude(amount=4.5)
    with BuildSketch(Plane(origin=(9.36655085, 2, -32.105993834), x_dir=(0, 0.9996219169112968, -0.027495876610589075), z_dir=(1, 0, 0)), Plane(origin=(53.509916826, 2, 25.894006166), x_dir=(0, 0.9996219169112968, 0.027495876610585623), z_dir=(-1, 0, 0))) as chamfer5_piece_11:
        Polygon((CHAMFER5_SIZE * 0.999621916911, CHAMFER5_SIZE * 0.0274958766106), (-CHAMFER5_SIZE * 0.0274958766106, CHAMFER5_SIZE * 0.999621916911), (0, 0), align=None)
    extrude(amount=44.143365976)
    with BuildSketch(Plane(origin=(53.938233838, 2, -27.605993834), x_dir=(0, 0, 1), z_dir=(1, 0, 0))) as chamfer5_piece_12:
        Polygon((3, -CHAMFER5_SIZE), (3 + CHAMFER5_SIZE, 0), (3, 0), align=None)
    revolve(axis=Axis((53.938233838, 2, -27.605993834), (0, -1, 0)), revolution_arc=90)
    with BuildSketch(Plane(origin=(-70.561766162, 2, -32.105993834), x_dir=(0, -0.027495876610586605, 0.9996219169112968), z_dir=(1, 0, 0))) as chamfer5_piece_13:
        Polygon((CHAMFER5_SIZE * 0.999621916911, -CHAMFER5_SIZE * 0.0274958766106), (-CHAMFER5_SIZE * 0.0274958766106, -CHAMFER5_SIZE * 0.999621916911), (0, 0), align=None)
    extrude(amount=83.071682988)
    with BuildSketch(Plane(origin=(9.938233838, 2, 25.894006166), x_dir=(-0.9996219169112968, -0.027495876610586556, 0), z_dir=(0, 0, -1))) as chamfer5_piece_14:
        Polygon((CHAMFER5_SIZE * 0.999621916911, CHAMFER5_SIZE * 0.0274958766106), (-CHAMFER5_SIZE * 0.0274958766106, CHAMFER5_SIZE * 0.999621916911), (0, 0), align=None)
    extrude(amount=58)
    with BuildSketch(Plane(origin=(11.938233838, 2, -32.105993834), x_dir=(-0.027495876610585623, 0.9996219169112968, 0), z_dir=(0, 0, 1))) as chamfer5_piece_15:
        Polygon((CHAMFER5_SIZE * 0.999621916911, -CHAMFER5_SIZE * 0.0274958766106), (-CHAMFER5_SIZE * 0.0274958766106, -CHAMFER5_SIZE * 0.999621916911), (0, 0), align=None)
    extrude(amount=58)

    # CSK for #4 Flat Head Socket Cap Screw1
    with Locations(Plane(origin=(0, 0, 0), x_dir=(-1, 0, 0), z_dir=(0, -1, 0))):
        with Locations((68.061766162, 27.605993834), (68.061766162, -21.394006166), (-53.938233838, 27.605993834), (-53.938233838, -21.394006166), (10.061766162, -21.394006166), (10.061766162, 27.605993834)):
            CounterSinkHole(CSK_FOR_4_FLAT_HEAD_SOCKET_CAP_SCREW1_D / 2, CSK_FOR_4_FLAT_HEAD_SOCKET_CAP_SCREW1_CSINK_D / 2, depth=CSK_FOR_4_FLAT_HEAD_SOCKET_CAP_SCREW1_DEPTH, counter_sink_angle=CSK_FOR_4_FLAT_HEAD_SOCKET_CAP_SCREW1_CSINK_ANGLE)
            with Locations((0, 0, -(CSK_FOR_4_FLAT_HEAD_SOCKET_CAP_SCREW1_DEPTH + CSK_FOR_4_FLAT_HEAD_SOCKET_CAP_SCREW1_TIP / 2))):  # 118° drill point
                Cone(0, CSK_FOR_4_FLAT_HEAD_SOCKET_CAP_SCREW1_D / 2, CSK_FOR_4_FLAT_HEAD_SOCKET_CAP_SCREW1_TIP, mode=Mode.SUBTRACT)

    # Chamfer7
    chamfer7_edges = [part.edges().sort_by_distance(p)[0] for p in [
        (-7.061766162, 0, -34.405993834),
        (-74.861766162, 0, -3.105993834),
        (60.738233838, 0, -3.105993834),
        (-7.061766162, 0, 28.194006166),
        (59.478792997, 0, 26.934565325),
        (-73.602325321, 0, 26.934565325),
        (-73.602325321, 0, -33.146552993),
        (59.478792997, 0, -33.146552993),
    ]]
    chamfer(chamfer7_edges, length=CHAMFER7_SIZE)

    # Chamfer8
    chamfer8_edges = [part.edges().sort_by_distance(p)[0] for p in [
        (-74.861766162, 2, -2.982922372),
    ]]
    chamfer(chamfer8_edges, length=CHAMFER8_SIZE - 0.0001)  # a hair under: the kernel refuses the full size

    # Sketch29 → Cut-Extrude3 (cut)
    with BuildSketch(Plane(origin=(0, 8.5, 0), x_dir=(1, 0, 0), z_dir=(0, 1, 0)).offset(CUT_EXTRUDE3_START)):
        with BuildLine():
            Line((53.938233838, 24.605993834), (58.438233838, 24.605993834))
            Line((58.438233838, 24.605993834), (58.438233838, 30.105993834))
            ThreePointArc((58.438233838, 30.105993834), (57.8524474, 31.520207397), (56.438233838, 32.105993834))
            Line((56.438233838, 32.105993834), (50.938233838, 32.105993834))
            Line((50.938233838, 32.105993834), (50.938233838, 27.605993834))
            ThreePointArc((50.938233838, 27.605993834), (56.059554181, 29.727314178), (53.938233838, 24.605993834))
        make_face()
        with BuildLine():
            Line((53.938233838, -18.394006166), (58.438233838, -18.394006166))
            Line((58.438233838, -18.394006166), (58.438233838, -23.894006166))
            ThreePointArc((58.438233838, -23.894006166), (57.8524474, -25.308219728), (56.438233838, -25.894006166))
            Line((56.438233838, -25.894006166), (50.938233838, -25.894006166))
            Line((50.938233838, -25.894006166), (50.938233838, -21.394006166))
            ThreePointArc((50.938233838, -21.394006166), (56.059554181, -23.515326509), (53.938233838, -18.394006166))
        make_face()
    extrude(amount=CUT_EXTRUDE3_DEPTH, mode=Mode.SUBTRACT)

    # Fillet21
    fillet21_edges = [part.edges().sort_by_distance(p)[0] for p in [
        (-54.861766162, 2.7, 26.894006166),
        (-66.861766162, 2.7, 26.894006166),
    ]]
    fillet(fillet21_edges, radius=FILLET21_R)

    # Chamfer9
    chamfer9_edges = [part.edges().sort_by_distance(p)[0] for p in [
        (-18.061766162, 5.4, 28.194006166),
        (-54.861766162, 6.6, 28.194006166),
        (-60.861766162, 2.7, 28.194006166),
        (-55.4475526, 3.285786438, 28.194006166),
        (-66.275979725, 3.285786438, 28.194006166),
        (-66.861766162, 6.6, 28.194006166),
        (-47.777982648, 7.1, 28.194006166),
        (-39.527982648, 5.7, 28.194006166),
        (-31.277982648, 7.1, 28.194006166),
    ]]
    chamfer(chamfer9_edges, length=CHAMFER9_SIZE)

    # Sketch30 → Cut-Extrude4 (cut, through all)
    with BuildSketch(Plane(origin=(0, 2, 0), x_dir=(1, 0, 0), z_dir=(0, 1, 0))):
        with Locations((-73.211766162, 2.982922372)):
            Rectangle(SKETCH30_W, SKETCH30_H)
    extrude(amount=-CUT_EXTRUDE4_DEPTH, mode=Mode.SUBTRACT)

    # Fillet22
    fillet22_edges = [part.edges().sort_by_distance(p)[0] for p in [
        (-71.561766162, 1, -9.732922372),
        (-71.561766162, 1, 3.767077628),
    ]]
    fillet(fillet22_edges, radius=FILLET22_R)

    # Chamfer11
    chamfer11_edges = [part.edges().sort_by_distance(p)[0] for p in [
        (-73.211766162, 0, 3.767077628),
        (-73.211766162, 0, -9.732922372),
        (-71.854659381, 0, 3.474184409),
        (-71.854659381, 0, -9.440029154),
        (-71.561766162, 0, -2.982922372),
    ]]
    chamfer(chamfer11_edges, length=CHAMFER11_SIZE)


solid = part.part
